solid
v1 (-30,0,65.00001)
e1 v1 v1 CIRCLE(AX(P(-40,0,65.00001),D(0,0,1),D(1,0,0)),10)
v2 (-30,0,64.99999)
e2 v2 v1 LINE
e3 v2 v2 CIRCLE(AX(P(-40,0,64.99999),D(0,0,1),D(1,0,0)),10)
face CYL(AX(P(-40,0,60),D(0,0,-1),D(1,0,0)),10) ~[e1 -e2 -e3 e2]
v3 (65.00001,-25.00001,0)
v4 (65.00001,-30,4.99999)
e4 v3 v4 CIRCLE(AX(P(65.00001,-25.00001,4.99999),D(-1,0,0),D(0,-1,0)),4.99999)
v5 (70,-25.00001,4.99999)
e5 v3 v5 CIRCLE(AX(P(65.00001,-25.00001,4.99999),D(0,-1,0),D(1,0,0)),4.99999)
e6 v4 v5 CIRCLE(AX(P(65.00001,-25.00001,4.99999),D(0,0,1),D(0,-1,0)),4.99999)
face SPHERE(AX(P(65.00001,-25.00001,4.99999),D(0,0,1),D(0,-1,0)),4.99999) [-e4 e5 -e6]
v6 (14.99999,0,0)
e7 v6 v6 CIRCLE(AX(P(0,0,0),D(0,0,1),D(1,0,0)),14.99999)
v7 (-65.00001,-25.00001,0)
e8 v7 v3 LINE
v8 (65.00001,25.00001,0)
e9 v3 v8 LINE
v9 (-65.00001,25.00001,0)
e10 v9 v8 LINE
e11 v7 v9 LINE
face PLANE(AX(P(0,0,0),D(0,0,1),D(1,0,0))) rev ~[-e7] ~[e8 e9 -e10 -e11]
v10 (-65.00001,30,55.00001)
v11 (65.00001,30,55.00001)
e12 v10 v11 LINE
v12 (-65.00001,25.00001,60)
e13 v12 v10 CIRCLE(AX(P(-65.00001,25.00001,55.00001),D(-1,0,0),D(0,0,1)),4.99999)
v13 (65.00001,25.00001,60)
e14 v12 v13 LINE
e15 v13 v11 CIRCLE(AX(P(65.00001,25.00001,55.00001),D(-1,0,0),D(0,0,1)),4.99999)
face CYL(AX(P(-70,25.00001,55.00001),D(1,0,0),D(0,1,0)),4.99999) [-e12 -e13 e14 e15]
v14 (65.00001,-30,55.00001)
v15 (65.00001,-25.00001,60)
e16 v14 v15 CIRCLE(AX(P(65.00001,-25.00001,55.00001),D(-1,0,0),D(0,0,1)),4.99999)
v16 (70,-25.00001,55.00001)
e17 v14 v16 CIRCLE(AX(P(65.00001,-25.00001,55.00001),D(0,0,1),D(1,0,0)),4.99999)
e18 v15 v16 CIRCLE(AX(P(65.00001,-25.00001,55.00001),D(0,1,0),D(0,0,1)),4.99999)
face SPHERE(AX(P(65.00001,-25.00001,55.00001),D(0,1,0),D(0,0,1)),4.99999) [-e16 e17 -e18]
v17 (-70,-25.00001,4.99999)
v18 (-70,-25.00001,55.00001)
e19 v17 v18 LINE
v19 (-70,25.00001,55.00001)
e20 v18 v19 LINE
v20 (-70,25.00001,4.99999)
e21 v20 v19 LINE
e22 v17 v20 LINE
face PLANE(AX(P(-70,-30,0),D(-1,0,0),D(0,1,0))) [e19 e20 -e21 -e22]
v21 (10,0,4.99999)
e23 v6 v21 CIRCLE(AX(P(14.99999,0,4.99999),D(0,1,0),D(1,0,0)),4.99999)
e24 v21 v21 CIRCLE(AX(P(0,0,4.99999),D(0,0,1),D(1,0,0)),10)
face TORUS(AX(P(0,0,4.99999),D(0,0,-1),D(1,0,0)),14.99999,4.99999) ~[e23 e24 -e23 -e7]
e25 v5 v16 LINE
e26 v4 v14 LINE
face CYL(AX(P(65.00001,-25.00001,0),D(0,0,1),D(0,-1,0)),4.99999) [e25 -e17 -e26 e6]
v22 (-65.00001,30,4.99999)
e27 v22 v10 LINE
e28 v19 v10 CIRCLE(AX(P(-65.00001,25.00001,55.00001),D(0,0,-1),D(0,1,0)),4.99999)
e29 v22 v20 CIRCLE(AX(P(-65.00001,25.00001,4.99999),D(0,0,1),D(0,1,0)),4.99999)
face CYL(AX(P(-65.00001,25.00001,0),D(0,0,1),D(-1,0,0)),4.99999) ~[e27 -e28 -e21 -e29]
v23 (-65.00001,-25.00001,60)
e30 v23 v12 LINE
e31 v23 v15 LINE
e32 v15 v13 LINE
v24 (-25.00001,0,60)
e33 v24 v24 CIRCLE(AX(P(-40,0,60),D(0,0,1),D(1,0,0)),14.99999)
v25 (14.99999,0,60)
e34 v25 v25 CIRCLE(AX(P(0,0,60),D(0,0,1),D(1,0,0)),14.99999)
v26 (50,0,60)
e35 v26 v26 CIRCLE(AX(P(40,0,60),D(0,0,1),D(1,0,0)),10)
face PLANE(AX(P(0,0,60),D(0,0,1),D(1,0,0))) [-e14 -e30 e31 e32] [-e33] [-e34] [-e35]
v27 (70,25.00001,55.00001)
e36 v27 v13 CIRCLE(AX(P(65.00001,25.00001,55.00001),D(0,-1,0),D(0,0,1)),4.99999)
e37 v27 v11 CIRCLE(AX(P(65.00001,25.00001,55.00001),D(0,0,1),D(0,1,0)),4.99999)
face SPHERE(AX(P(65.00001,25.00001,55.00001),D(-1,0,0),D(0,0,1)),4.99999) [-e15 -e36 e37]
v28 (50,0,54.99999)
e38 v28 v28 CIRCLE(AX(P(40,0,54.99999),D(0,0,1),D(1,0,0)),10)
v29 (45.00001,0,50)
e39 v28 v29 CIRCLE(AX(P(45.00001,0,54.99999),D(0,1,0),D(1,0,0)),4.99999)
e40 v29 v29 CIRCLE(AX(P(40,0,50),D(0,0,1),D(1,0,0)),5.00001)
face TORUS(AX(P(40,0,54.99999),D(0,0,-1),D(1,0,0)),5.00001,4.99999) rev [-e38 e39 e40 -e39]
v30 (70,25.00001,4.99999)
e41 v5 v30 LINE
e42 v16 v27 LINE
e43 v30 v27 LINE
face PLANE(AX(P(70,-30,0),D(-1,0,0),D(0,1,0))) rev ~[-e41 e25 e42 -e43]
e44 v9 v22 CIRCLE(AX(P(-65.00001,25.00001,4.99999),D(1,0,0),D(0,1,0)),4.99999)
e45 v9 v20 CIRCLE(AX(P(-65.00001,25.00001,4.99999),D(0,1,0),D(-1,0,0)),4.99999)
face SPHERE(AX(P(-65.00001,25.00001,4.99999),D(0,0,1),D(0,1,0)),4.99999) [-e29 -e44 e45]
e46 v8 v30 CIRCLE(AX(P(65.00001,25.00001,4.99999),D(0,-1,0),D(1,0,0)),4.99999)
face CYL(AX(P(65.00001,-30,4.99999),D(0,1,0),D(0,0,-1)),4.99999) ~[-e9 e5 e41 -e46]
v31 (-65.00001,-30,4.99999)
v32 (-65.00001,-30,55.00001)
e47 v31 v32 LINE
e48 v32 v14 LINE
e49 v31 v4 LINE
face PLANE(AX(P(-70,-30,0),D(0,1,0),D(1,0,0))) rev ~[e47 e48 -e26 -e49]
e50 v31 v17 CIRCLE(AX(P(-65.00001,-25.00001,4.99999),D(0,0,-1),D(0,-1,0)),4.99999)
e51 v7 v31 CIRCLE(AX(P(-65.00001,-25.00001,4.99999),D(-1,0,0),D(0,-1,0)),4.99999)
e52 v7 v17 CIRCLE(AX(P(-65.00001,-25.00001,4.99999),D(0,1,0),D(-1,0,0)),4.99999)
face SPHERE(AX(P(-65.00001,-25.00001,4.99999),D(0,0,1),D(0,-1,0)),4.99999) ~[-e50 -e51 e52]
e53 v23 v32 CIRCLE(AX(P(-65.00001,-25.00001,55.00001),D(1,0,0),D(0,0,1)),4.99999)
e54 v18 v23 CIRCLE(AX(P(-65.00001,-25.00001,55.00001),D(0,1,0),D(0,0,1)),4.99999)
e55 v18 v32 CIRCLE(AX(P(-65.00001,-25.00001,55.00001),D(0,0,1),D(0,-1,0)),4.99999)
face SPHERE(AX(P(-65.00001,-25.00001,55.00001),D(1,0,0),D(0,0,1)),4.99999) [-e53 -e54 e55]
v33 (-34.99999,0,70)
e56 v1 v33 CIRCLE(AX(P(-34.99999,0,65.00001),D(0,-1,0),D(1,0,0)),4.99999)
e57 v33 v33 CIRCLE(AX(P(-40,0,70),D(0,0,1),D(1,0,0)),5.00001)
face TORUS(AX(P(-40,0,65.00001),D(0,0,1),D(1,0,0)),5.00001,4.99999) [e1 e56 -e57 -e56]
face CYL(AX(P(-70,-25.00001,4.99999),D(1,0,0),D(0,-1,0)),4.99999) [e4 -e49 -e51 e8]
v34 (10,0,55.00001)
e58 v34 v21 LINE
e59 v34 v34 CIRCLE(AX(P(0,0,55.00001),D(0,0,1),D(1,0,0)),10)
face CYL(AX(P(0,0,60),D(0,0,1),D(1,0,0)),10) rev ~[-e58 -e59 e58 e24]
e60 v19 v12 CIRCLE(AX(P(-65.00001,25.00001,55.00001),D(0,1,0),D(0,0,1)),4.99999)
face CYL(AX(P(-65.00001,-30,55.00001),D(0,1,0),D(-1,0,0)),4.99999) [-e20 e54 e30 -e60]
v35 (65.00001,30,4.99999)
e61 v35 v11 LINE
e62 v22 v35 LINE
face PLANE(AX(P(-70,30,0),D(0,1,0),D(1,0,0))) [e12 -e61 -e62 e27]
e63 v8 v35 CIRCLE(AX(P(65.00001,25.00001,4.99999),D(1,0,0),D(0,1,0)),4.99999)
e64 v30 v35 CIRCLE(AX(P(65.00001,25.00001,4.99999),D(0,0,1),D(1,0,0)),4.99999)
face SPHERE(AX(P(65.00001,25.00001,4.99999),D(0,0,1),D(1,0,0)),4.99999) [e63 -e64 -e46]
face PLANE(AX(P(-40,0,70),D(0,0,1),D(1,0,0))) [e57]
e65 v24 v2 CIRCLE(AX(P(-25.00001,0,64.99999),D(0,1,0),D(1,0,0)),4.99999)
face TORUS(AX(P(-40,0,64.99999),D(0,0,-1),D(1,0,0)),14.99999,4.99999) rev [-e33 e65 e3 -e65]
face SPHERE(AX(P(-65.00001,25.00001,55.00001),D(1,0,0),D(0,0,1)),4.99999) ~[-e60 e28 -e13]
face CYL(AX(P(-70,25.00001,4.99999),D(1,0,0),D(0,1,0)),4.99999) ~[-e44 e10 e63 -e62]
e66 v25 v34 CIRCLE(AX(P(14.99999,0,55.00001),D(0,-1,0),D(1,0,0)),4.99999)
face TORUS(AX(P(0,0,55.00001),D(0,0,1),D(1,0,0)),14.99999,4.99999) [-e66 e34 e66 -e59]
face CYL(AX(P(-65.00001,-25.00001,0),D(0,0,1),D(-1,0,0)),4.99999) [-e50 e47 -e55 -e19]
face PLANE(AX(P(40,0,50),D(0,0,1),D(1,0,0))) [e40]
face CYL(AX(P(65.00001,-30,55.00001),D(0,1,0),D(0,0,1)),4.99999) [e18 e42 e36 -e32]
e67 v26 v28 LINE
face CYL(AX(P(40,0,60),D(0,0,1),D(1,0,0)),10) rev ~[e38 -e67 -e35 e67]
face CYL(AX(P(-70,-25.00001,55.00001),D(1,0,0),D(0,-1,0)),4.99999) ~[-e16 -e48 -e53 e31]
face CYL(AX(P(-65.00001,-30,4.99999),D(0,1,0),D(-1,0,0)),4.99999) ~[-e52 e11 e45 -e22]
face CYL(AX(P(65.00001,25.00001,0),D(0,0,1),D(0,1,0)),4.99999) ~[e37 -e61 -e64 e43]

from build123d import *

# Parameters (mm, degrees)
F0_W     = 140
F0_H     = 60
F1_DEPTH = 60
F2_R     = 10
F5_DEPTH = 10
F4_R     = 10
F6_DEPTH = 93.7
F3_R     = 10
F7_DEPTH = 10
F8_R     = 4.99999


# Not quite as in the source:
# - a fillet or chamfer is up to 0.001 mm smaller than in the source, because OpenCascade refuses the exact size


with BuildPart() as f1:
    # F0 (on Top) → F1 (new body)
    with BuildSketch(Plane.XY):
        Rectangle(F0_W, F0_H)
    extrude(amount=F1_DEPTH)

    # F2 (on face) → F5 (join)
    with BuildSketch(Plane.XY.offset(60)):
        with Locations((-40, 0)):
            Circle(F2_R)
    extrude(amount=F5_DEPTH)

    # F4 (on face) → F6 (cut)
    with BuildSketch(Plane.XY.offset(60)):
        Circle(F4_R)
    extrude(amount=-F6_DEPTH, mode=Mode.SUBTRACT)

    # F3 (on face) → F7 (cut)
    with BuildSketch(Plane.XY.offset(60)):
        with Locations((40, 0)):
            Circle(F3_R)
    extrude(amount=-F7_DEPTH, mode=Mode.SUBTRACT)

    # F8 (radius 5 in the source; OpenCascade refuses exactly that, so slightly less here)
    f8_edges = [f1.edges().sort_by_distance(p)[0] for p in [
        (0, 30, 60),
        (70, 0, 60),
        (0, -30, 60),
        (-70, 0, 60),
        (70, -30, 30),
        (70, 30, 30),
        (-70, -30, 30),
        (-70, 30, 30),
        (-50, 0, 70),
        (-10, 0, 60),
        (10, 0, 30),
        (-10, 0, 0),
        (30, 0, 50),
        (-50, 0, 60),
        (0, -30, 0),
        (70, 0, 0),
        (0, 30, 0),
        (-70, 0, 0),
    ]]
    fillet(f8_edges, radius=F8_R)


solid = f1.part
